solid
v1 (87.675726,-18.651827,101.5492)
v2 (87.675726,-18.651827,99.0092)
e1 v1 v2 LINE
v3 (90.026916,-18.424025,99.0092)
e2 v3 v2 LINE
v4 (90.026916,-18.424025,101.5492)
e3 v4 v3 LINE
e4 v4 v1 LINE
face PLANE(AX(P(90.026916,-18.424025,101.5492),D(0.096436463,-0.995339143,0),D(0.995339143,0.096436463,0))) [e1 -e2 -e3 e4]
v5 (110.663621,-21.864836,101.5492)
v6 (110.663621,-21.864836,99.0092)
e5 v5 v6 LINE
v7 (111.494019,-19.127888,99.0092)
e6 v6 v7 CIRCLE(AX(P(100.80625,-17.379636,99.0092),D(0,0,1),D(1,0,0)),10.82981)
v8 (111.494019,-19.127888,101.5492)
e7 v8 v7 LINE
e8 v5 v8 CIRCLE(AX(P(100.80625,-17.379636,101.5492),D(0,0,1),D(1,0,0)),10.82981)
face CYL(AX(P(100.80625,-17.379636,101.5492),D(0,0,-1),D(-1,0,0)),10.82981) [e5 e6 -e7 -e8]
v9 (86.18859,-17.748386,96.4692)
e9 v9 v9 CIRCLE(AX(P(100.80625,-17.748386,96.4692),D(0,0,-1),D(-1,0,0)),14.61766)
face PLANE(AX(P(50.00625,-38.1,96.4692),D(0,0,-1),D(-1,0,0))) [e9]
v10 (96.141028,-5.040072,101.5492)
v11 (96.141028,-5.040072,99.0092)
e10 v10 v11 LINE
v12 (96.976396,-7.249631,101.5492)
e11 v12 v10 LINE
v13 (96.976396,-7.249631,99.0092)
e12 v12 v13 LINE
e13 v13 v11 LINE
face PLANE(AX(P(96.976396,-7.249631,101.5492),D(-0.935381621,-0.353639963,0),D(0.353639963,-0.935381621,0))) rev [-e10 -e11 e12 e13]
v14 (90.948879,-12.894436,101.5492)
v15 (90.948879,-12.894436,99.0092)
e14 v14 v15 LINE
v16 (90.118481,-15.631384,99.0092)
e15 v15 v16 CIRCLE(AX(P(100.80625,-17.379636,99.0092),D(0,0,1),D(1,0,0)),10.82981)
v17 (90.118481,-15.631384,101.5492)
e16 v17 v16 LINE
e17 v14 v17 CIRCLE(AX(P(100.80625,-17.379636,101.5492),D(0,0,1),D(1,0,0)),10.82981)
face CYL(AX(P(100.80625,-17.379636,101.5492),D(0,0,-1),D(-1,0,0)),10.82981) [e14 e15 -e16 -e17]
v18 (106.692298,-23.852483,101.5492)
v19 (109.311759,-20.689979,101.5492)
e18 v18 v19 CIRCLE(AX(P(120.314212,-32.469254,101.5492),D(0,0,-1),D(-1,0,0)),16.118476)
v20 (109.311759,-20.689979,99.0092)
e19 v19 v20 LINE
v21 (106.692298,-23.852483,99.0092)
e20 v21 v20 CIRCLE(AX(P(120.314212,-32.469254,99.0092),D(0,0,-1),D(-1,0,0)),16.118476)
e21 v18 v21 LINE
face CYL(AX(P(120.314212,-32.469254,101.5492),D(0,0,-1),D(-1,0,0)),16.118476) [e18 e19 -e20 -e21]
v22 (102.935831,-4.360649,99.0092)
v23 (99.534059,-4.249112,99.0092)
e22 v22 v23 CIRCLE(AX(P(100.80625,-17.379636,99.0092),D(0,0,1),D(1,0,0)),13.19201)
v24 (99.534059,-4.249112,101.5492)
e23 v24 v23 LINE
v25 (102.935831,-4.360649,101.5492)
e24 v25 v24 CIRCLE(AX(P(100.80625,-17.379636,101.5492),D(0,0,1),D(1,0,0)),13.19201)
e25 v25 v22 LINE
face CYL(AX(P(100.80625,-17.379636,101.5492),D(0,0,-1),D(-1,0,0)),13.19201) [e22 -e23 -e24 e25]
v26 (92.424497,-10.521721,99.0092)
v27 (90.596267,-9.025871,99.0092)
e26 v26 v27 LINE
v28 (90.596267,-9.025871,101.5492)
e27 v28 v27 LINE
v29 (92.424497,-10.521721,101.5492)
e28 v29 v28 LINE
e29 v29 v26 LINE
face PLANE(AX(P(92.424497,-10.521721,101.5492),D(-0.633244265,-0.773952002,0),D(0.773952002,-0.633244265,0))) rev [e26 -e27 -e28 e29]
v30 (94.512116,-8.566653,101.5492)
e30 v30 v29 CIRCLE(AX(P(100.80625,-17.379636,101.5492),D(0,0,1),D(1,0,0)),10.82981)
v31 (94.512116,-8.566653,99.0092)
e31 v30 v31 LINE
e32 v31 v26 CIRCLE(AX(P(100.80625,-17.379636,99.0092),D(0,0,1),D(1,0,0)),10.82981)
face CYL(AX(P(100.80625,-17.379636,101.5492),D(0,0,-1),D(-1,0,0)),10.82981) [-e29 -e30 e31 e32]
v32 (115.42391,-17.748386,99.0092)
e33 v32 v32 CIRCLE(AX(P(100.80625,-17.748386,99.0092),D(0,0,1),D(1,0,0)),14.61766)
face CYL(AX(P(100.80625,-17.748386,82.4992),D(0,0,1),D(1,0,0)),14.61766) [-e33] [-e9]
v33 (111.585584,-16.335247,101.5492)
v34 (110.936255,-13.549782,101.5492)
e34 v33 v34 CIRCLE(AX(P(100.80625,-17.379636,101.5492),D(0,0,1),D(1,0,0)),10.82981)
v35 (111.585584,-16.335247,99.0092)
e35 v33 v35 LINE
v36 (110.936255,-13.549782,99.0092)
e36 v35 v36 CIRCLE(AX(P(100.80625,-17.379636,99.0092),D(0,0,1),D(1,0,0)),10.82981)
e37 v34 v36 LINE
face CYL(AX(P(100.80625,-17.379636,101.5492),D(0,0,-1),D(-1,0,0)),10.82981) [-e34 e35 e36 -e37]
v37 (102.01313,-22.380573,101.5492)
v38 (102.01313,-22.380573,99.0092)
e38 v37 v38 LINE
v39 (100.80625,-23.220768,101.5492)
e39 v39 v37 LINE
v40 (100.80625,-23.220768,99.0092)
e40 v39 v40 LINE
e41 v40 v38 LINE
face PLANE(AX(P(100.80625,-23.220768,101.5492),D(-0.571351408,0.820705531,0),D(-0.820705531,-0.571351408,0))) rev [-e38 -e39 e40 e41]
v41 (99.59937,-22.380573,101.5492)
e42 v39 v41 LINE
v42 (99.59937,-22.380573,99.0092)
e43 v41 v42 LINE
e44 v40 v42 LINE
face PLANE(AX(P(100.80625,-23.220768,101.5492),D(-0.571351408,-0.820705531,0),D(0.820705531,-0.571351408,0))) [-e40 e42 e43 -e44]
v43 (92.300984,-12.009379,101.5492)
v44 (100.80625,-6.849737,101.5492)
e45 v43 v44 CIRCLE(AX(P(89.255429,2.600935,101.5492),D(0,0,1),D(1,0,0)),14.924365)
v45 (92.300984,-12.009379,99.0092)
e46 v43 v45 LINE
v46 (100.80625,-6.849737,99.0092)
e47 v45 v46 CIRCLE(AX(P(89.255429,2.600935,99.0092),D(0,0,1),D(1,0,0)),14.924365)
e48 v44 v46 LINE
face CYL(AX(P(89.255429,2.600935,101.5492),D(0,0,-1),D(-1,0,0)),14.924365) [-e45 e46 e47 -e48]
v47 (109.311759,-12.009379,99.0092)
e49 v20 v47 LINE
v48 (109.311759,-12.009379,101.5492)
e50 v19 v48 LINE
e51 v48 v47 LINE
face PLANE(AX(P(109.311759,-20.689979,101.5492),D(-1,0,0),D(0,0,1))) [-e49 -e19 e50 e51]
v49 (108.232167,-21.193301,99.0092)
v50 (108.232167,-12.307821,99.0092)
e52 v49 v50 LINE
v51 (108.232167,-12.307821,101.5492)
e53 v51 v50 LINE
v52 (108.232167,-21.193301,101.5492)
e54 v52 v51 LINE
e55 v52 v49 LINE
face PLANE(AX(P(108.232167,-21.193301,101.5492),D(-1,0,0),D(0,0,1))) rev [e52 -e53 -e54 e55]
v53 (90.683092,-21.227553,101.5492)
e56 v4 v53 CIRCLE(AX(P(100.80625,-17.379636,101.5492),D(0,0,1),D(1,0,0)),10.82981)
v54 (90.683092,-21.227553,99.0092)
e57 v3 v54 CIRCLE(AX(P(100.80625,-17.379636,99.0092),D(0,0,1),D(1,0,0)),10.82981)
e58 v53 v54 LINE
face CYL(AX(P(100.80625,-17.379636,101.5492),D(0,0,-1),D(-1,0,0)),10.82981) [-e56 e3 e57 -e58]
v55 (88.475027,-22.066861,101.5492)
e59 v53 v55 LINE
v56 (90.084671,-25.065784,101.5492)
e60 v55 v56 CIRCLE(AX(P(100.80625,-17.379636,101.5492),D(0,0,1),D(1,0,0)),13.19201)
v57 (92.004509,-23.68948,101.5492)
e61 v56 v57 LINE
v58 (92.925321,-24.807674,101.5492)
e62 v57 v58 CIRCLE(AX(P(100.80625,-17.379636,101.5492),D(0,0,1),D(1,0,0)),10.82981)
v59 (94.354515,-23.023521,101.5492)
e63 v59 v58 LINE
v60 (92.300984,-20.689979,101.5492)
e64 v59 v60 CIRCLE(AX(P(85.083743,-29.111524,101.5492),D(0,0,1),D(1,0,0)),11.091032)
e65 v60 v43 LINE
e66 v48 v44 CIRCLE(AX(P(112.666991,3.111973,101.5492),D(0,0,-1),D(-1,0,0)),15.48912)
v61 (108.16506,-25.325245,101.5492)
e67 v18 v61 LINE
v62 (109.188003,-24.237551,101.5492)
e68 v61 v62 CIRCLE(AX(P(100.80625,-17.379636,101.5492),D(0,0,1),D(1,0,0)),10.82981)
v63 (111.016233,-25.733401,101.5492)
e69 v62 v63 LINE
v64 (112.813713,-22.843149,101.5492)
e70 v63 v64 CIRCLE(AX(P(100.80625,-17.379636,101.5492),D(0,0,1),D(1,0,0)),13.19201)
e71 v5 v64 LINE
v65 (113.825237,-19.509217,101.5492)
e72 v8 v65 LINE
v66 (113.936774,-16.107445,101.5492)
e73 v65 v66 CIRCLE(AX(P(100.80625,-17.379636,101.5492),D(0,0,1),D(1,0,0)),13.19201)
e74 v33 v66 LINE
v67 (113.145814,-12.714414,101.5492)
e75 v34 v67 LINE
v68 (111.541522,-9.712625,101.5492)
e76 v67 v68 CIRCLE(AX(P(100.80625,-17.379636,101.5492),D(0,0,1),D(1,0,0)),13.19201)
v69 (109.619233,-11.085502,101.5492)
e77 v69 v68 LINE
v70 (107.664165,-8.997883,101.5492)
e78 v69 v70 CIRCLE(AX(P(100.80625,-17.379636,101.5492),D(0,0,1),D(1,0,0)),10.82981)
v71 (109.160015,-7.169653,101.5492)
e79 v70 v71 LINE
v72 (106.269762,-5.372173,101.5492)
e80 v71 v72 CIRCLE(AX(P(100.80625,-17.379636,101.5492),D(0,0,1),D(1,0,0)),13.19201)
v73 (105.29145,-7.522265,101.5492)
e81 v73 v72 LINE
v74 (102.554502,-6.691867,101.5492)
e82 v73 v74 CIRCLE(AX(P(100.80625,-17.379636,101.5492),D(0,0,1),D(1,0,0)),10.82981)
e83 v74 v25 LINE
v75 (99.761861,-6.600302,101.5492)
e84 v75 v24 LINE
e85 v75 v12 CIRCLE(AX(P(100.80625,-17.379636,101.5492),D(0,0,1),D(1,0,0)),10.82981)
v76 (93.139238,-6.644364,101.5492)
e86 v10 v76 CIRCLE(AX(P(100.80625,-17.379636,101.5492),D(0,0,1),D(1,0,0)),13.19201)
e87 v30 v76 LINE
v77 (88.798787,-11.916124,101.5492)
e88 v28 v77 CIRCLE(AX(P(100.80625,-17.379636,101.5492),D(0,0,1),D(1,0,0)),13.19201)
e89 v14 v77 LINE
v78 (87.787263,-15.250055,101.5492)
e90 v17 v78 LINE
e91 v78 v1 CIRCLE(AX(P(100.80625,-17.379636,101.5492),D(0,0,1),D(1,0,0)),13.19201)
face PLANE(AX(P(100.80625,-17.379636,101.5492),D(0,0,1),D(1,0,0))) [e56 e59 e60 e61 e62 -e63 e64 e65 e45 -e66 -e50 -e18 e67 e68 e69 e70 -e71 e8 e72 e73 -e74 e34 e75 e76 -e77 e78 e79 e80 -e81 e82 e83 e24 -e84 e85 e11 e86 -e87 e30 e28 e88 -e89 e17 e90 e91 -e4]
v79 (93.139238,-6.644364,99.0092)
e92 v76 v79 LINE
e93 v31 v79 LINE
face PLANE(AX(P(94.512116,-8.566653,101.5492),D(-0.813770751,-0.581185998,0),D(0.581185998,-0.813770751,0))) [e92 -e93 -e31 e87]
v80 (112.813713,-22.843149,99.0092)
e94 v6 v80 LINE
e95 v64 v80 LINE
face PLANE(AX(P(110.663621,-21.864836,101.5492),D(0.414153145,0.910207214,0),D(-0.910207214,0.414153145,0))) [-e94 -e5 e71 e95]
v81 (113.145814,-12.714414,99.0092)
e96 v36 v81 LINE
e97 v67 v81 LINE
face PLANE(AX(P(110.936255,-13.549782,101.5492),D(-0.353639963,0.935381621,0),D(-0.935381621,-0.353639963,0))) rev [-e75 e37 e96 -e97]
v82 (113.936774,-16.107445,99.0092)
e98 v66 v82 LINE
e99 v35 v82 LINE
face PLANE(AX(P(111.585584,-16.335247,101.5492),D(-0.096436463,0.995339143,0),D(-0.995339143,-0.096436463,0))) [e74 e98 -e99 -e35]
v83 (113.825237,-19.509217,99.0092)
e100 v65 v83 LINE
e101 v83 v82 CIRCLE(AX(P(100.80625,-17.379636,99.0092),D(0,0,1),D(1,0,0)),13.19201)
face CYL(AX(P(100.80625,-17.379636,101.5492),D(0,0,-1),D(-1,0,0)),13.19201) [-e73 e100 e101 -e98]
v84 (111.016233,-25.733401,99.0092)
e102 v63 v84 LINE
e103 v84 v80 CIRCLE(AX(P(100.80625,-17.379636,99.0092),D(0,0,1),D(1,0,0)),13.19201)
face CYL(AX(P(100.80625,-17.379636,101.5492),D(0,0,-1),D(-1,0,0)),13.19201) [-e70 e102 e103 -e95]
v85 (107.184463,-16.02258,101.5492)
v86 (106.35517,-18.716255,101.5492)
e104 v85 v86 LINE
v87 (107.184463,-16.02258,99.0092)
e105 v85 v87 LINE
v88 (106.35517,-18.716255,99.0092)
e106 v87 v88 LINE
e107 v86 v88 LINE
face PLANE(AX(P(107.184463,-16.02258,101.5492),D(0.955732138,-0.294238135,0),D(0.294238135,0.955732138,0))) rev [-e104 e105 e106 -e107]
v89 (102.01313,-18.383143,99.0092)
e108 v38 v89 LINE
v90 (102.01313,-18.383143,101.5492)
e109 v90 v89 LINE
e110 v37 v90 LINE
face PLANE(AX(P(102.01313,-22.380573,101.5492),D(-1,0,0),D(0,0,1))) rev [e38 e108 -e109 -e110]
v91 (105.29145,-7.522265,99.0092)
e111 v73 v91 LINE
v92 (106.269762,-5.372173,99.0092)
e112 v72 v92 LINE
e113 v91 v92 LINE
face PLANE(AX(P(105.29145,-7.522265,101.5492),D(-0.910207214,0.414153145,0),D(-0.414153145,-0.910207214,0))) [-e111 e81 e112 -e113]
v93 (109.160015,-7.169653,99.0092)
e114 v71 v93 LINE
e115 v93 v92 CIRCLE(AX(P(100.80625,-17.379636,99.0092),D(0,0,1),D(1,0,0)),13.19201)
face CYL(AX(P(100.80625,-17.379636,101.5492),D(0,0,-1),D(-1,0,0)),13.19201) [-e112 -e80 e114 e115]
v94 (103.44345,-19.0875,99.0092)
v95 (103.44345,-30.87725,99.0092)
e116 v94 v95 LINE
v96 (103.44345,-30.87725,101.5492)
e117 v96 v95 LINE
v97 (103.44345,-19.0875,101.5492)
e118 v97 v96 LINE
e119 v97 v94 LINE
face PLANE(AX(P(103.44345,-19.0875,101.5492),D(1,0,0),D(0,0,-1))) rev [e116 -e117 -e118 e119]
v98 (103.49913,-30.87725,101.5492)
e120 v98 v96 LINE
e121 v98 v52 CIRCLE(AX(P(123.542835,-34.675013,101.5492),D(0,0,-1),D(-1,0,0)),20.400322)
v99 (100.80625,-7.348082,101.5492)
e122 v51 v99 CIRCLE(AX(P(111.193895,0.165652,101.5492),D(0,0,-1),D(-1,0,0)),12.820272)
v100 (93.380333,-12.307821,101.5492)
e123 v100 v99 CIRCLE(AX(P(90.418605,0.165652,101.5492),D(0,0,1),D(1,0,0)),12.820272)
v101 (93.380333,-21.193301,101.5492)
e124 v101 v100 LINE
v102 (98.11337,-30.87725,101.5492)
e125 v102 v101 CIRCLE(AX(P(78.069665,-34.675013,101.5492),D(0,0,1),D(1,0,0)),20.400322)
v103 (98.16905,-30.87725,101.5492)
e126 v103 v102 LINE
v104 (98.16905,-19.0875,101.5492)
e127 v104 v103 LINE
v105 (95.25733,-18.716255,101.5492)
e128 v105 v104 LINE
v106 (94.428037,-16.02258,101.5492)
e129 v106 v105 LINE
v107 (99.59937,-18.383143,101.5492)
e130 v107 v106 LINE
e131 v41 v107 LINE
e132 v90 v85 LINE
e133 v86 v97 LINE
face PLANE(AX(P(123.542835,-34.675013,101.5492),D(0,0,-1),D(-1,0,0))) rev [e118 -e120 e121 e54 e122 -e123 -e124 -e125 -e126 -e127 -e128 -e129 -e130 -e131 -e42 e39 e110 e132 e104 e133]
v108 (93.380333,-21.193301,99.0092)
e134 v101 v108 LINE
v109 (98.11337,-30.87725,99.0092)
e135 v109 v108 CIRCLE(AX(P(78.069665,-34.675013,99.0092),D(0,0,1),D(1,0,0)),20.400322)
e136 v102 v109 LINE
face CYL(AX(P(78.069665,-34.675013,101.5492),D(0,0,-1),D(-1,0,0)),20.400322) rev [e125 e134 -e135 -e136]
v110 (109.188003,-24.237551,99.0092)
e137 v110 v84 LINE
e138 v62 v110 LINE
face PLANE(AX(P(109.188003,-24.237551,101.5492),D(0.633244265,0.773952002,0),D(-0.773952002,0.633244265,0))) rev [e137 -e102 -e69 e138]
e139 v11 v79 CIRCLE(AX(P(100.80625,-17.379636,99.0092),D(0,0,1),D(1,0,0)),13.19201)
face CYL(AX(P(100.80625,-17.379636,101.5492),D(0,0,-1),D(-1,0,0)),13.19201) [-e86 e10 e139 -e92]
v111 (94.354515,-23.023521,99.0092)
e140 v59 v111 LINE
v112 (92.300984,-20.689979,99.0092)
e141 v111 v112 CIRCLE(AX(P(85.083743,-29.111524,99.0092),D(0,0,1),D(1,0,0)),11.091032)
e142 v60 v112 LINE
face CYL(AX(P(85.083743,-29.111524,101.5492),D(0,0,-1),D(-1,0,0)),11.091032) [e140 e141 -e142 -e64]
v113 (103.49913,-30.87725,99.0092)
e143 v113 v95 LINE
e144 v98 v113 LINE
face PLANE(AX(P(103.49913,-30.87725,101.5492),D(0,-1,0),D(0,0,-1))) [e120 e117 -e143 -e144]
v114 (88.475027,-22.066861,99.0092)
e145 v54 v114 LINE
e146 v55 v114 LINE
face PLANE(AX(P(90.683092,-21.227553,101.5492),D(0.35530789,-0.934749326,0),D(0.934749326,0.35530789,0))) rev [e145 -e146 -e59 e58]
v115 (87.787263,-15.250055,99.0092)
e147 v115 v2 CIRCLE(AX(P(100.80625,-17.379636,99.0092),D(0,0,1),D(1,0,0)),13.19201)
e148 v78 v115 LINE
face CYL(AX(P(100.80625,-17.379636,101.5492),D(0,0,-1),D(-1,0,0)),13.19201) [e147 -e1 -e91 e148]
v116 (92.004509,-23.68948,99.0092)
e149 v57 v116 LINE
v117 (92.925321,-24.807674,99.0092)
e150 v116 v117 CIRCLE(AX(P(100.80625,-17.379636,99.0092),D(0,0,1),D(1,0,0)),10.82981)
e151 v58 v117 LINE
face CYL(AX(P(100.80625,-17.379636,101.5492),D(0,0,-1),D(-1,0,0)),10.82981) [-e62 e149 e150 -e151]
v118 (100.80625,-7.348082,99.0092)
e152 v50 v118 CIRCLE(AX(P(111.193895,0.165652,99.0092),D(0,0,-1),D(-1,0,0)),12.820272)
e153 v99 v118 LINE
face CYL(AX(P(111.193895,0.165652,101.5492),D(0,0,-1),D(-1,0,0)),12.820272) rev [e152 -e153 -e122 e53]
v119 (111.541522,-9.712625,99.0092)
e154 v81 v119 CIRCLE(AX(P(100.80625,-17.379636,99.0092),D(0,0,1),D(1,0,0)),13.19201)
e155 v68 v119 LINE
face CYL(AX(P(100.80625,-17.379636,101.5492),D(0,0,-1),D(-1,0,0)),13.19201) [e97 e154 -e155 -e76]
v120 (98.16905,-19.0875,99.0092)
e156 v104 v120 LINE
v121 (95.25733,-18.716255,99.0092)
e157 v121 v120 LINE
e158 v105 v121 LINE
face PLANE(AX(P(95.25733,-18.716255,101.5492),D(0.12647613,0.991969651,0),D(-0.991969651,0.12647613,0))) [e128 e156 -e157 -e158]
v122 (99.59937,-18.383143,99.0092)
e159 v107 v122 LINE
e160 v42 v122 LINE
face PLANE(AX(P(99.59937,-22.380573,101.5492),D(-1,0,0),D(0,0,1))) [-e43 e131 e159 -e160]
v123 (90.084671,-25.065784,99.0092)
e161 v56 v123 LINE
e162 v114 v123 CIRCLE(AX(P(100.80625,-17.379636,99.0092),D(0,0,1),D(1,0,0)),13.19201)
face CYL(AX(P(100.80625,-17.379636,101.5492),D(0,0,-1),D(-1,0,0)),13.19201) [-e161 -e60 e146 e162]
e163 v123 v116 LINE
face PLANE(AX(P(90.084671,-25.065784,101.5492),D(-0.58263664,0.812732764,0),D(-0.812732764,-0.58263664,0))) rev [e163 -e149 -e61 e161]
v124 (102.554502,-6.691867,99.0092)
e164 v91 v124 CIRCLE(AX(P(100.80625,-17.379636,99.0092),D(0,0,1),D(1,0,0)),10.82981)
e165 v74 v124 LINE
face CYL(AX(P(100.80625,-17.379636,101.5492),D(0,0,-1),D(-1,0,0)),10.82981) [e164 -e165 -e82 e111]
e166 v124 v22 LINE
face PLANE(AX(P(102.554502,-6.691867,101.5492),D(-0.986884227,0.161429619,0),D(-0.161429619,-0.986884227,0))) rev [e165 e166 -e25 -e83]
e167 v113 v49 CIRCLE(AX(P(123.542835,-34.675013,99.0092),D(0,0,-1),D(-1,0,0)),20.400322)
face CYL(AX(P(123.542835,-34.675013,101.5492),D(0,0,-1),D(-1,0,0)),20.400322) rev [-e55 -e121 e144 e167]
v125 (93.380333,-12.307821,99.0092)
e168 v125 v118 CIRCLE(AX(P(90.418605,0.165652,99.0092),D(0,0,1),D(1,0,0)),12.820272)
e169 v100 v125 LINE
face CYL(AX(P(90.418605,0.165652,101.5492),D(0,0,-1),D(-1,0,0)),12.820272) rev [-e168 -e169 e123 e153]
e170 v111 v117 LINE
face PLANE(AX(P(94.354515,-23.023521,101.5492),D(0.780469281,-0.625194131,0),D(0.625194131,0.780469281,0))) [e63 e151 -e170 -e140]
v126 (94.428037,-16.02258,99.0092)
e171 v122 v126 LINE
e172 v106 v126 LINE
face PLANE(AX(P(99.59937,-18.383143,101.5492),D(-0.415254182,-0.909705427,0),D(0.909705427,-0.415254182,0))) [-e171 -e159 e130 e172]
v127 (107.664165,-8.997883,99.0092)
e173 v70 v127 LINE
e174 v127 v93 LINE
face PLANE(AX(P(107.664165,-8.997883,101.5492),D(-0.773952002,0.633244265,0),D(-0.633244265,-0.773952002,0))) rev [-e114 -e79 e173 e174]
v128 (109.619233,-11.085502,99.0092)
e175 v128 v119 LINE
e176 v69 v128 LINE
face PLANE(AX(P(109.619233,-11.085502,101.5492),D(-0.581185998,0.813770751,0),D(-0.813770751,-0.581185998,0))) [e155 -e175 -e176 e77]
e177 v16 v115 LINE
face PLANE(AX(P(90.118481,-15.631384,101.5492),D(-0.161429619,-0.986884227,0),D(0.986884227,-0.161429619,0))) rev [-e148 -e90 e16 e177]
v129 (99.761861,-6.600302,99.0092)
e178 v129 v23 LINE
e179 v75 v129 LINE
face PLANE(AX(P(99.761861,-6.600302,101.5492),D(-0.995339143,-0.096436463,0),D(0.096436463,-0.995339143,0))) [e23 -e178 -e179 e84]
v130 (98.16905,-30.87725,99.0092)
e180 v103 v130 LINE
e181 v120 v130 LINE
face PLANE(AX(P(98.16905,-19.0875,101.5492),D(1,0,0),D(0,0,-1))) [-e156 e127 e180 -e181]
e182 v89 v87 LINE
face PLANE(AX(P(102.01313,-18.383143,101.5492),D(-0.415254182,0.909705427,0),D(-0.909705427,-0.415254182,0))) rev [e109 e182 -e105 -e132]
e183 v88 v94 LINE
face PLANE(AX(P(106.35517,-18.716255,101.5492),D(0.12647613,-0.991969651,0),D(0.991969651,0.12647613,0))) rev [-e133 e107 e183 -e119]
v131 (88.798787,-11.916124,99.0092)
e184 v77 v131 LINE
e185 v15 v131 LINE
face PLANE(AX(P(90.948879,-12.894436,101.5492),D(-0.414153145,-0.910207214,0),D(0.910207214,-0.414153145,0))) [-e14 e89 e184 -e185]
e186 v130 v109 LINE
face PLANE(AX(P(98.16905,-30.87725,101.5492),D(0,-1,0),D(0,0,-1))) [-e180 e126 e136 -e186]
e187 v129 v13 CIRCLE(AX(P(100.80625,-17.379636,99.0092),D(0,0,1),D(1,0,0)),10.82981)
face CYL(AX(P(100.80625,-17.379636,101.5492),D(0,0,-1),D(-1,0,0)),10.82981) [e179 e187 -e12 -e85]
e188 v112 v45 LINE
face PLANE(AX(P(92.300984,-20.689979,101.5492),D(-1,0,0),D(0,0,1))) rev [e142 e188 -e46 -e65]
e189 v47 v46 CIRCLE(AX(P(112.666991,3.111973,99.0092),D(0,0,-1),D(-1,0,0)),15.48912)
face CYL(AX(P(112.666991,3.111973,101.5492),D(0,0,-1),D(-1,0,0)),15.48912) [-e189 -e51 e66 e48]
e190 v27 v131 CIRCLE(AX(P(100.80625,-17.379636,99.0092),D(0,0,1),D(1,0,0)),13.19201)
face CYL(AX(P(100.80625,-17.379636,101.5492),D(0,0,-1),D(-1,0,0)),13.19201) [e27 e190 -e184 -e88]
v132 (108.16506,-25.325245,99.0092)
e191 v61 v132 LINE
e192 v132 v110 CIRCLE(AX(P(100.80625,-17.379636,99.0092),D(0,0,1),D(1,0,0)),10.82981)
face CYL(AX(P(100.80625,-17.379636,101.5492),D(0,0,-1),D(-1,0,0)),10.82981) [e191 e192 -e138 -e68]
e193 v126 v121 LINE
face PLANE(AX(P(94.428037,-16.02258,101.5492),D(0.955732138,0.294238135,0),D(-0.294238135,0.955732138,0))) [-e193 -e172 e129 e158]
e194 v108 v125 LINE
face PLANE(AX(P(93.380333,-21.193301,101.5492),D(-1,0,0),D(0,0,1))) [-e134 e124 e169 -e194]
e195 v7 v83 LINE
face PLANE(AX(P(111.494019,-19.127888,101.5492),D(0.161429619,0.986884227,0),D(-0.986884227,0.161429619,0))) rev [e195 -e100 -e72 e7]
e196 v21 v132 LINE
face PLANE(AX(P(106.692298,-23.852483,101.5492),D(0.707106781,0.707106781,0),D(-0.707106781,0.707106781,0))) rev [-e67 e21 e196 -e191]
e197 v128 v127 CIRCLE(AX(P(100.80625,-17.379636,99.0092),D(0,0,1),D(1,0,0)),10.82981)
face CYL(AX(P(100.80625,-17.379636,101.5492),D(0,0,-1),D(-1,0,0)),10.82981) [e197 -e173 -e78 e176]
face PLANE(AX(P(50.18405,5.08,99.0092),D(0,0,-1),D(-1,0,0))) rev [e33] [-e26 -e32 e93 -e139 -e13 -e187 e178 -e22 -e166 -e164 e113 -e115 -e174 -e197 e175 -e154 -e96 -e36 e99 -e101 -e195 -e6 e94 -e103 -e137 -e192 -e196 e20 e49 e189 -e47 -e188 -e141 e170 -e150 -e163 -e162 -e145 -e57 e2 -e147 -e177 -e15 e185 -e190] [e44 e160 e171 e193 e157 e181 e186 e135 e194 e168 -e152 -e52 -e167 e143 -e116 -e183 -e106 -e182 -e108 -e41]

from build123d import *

# Parameters (mm, degrees)
SKETCH1_R               = 13.8795
SKETCH1_R_2             = 13.8811
SKETCH1_R_3             = 2.54
SKETCH1_W               = 163.5125
SKETCH1_H               = 30.6038
BOSS_EXTRUDE1_DEPTH     = 5.08
SKETCH3_W               = 101.6
SKETCH3_H               = 2.54
BOSS_EXTRUDE4_DEPTH     = 38.1
SKETCH7_W               = 7.620008307
SKETCH7_H               = 5.08
BOSS_EXTRUDE5_DEPTH     = 11.43
FILLET5_RADIUS          = 3.810004153
FILLET5_LENGTH          = 5.08
BOSS_EXTRUDE6_DEPTH     = 2.54
SKETCH15_R              = 1.8415
BOSS_EXTRUDE7_DEPTH     = 2.54
CUT_EXTRUDE3_START      = -5.08
SKETCH19_R              = 1.8415
CUT_EXTRUDE3_DEPTH      = 5.08
SKETCH12_W              = 155.030782426
SKETCH12_H              = 26.837151361
CUT_EXTRUDE4_DEPTH      = 229.935471644
CUT_EXTRUDE5_DEPTH      = 2.54
FILLET6_R               = 2.54
BOSS_EXTRUDE8_DEPTH     = 5.08
CUT_EXTRUDE6_DEPTH      = 186.437362631
CUT_EXTRUDE6_DEPTH_BACK = 186.437362631
SKETCH23_R              = 1.8415
SKETCH25_W              = 130.43271363
SKETCH25_H              = 56.644769142
SKETCH25_R              = 14.617659747
CUT_EXTRUDE8_DEPTH      = 158.1898379


with BuildPart() as part:
    # Sketch1 → Boss-Extrude1 (new body)
    with BuildSketch(Plane(origin=(0, 0, 0), x_dir=(1, 0, 0), z_dir=(0, 1, 0))):
        with BuildLine():
            Line((0, 0), (201.6125, 0))
            Line((201.6125, 0), (201.6125, -45.847))
            Line((201.6125, -45.847), (166.66845, -45.847))
            Line((166.66845, -45.847), (166.66845, -83.7692))
            ThreePointArc((166.66845, -83.7692), (162.204757345, -94.545507345), (151.42845, -99.0092))
            Line((151.42845, -99.0092), (50.18405, -99.0092))
            ThreePointArc((50.18405, -99.0092), (39.407742655, -94.545507345), (34.94405, -83.7692))
            Line((34.94405, -83.7692), (34.94405, -45.847))
            Line((34.94405, -45.847), (0, -45.847))
            Line((0, -45.847), (0, 0))
        make_face()
        with Locations(Location((60.34405, -72.4265, 0), (0, 0, 270))):
            Circle(SKETCH1_R, mode=Mode.SUBTRACT)
        with Locations(Location((141.26845, -72.4281, 0), (0, 0, 270))):
            Circle(SKETCH1_R_2, mode=Mode.SUBTRACT)
        with Locations(Location((13.096875, -9.7139, 0), (0, 0, 270))):
            Circle(SKETCH1_R_3, mode=Mode.SUBTRACT)
        with Locations(Location((188.515625, -9.7139, 0), (0, 0, 270))):
            Circle(SKETCH1_R_3, mode=Mode.SUBTRACT)
        with Locations(Location((13.096875, -36.1299, 0), (0, 0, 270))):
            Circle(SKETCH1_R_3, mode=Mode.SUBTRACT)
        with Locations(Location((188.515625, -36.1299, 0), (0, 0, 270))):
            Circle(SKETCH1_R_3, mode=Mode.SUBTRACT)
        with Locations(Location((100.80625, -72.4281, 0), (0, 0, 270))):
            Circle(SKETCH1_R_2, mode=Mode.SUBTRACT)
        with Locations((100.80625, -22.9219)):
            Rectangle(SKETCH1_W, SKETCH1_H, mode=Mode.SUBTRACT)
    extrude(amount=BOSS_EXTRUDE1_DEPTH)

    # Sketch3 → Boss-Extrude4 (add)
    with BuildSketch(Plane(origin=(0, 0, 198.0184), x_dir=(-1, 0, 0), z_dir=(0, 1, 0))):
        with Locations((-100.80625, -100.2792)):
            Rectangle(SKETCH3_W, SKETCH3_H)
    extrude(amount=-BOSS_EXTRUDE4_DEPTH)

    # Sketch7 → Boss-Extrude5 (add)
    with BuildSketch(Plane(origin=(0, 0, 99.0092), x_dir=(1, 0, 0), z_dir=(0, 0, -1))):
        with Locations((100.806245847, 35.56)):
            Rectangle(SKETCH7_W, SKETCH7_H)
    extrude(amount=BOSS_EXTRUDE5_DEPTH)

    # Fillet5: full round fillet: the end face becomes a half cylinder, R = half its width
    fillet5_face = Plane((100.806245847, -35.56, 87.5792), x_dir=(0, 1, 0), z_dir=(0, 0, -1))  # on the end face: x along it, z out of the body
    fillet5_slab = fillet5_face.offset(-FILLET5_RADIUS / 2) * Box(FILLET5_LENGTH, 2 * FILLET5_RADIUS, FILLET5_RADIUS, mode=Mode.PRIVATE)  # the body's end, R deep
    fillet5_round = Plane((100.806245847, -35.56, 91.389204153), x_dir=(0, 0, -1), z_dir=(0, 1, 0)) * Cylinder(FILLET5_RADIUS, FILLET5_LENGTH, mode=Mode.PRIVATE)  # its axis R under the face
    add(fillet5_slab - fillet5_round, mode=Mode.SUBTRACT)

    # Sketch14 → Boss-Extrude6 (add)
    with BuildSketch(Plane(origin=(0, 0, 99.0092), x_dir=(-1, 0, 0), z_dir=(0, 0, -1))):
        with BuildLine():
            Line((-106.692297799, -23.852483199), (-108.165059803, -25.325245202))
            ThreePointArc((-108.165059803, -25.325245202), (-108.695299399, -24.799048835), (-109.188003193, -24.237551179))
            Line((-109.188003193, -24.237551179), (-111.016232612, -25.73340078))
            ThreePointArc((-111.016232612, -25.73340078), (-112.008576056, -24.346487635), (-112.813712744, -22.843148519))
            Line((-112.813712744, -22.843148519), (-110.663621263, -21.864835961))
            ThreePointArc((-110.663621263, -21.864835961), (-111.169570673, -20.523896068), (-111.494018753, -19.127888173))
            Line((-111.494018753, -19.127888173), (-113.825236675, -19.509217219))
            ThreePointArc((-113.825236675, -19.509217219), (-113.991174734, -17.81194348), (-113.936774001, -16.107445271))
            Line((-113.936774001, -16.107445271), (-111.585583879, -16.335247483))
            ThreePointArc((-111.585583879, -16.335247483), (-111.353278975, -14.920984767), (-110.936255307, -13.549782426))
            Line((-110.936255307, -13.549782426), (-113.145813772, -12.714414106))
            ThreePointArc((-113.145813772, -12.714414106), (-112.440883477, -11.161562901), (-111.541521956, -9.712624518))
            Line((-111.541521956, -9.712624518), (-109.619232687, -11.085502082))
            ThreePointArc((-109.619232687, -11.085502082), (-108.71091938, -9.976867094), (-107.664165119, -8.997882867))
            Line((-107.664165119, -8.997882867), (-109.160014721, -7.169653447))
            ThreePointArc((-109.160014721, -7.169653447), (-107.773101576, -6.177310003), (-106.26976246, -5.372173315))
            Line((-106.26976246, -5.372173315), (-105.291449901, -7.522264796))
            ThreePointArc((-105.291449901, -7.522264796), (-103.950510009, -7.016315387), (-102.554502114, -6.691867307))
            Line((-102.554502114, -6.691867307), (-102.93583116, -4.360649385))
            ThreePointArc((-102.93583116, -4.360649385), (-101.238557421, -4.194711325), (-99.534059212, -4.249112058))
            Line((-99.534059212, -4.249112058), (-99.761861424, -6.600302181))
            ThreePointArc((-99.761861424, -6.600302181), (-98.347598708, -6.832607085), (-96.976396367, -7.249630753))
            Line((-96.976396367, -7.249630753), (-96.141028047, -5.040072288))
            ThreePointArc((-96.141028047, -5.040072288), (-94.588176842, -5.745002582), (-93.139238459, -6.644364103))
            Line((-93.139238459, -6.644364103), (-94.512116023, -8.566653372))
            ThreePointArc((-94.512116023, -8.566653372), (-93.403481035, -9.474966679), (-92.424496807, -10.52172094))
            Line((-92.424496807, -10.52172094), (-90.596267388, -9.025871338))
            ThreePointArc((-90.596267388, -9.025871338), (-89.603923944, -10.412784483), (-88.798787256, -11.9161236))
            Line((-88.798787256, -11.9161236), (-90.948878737, -12.894436158))
            ThreePointArc((-90.948878737, -12.894436158), (-90.442929327, -14.23537605), (-90.118481247, -15.631383945))
            Line((-90.118481247, -15.631383945), (-87.787263325, -15.250054899))
            ThreePointArc((-87.787263325, -15.250054899), (-87.621325266, -16.947328638), (-87.675725999, -18.651826847))
            Line((-87.675725999, -18.651826847), (-90.026916121, -18.424024635))
            ThreePointArc((-90.026916121, -18.424024635), (-90.261418035, -19.847693028), (-90.683092324, -21.227553033))
            Line((-90.683092324, -21.227553033), (-88.475027465, -22.066861331))
            ThreePointArc((-88.475027465, -22.066861331), (-89.182726542, -23.618452644), (-90.084671181, -25.065784483))
            Line((-90.084671181, -25.065784483), (-92.004508517, -23.689480212))
            ThreePointArc((-92.004508517, -23.689480212), (-92.446198552, -24.26398978), (-92.925321338, -24.807674144))
            Line((-92.925321338, -24.807674144), (-94.354515121, -23.023521367))
            ThreePointArc((-94.354515121, -23.023521367), (-93.409906556, -21.784451479), (-92.300984022, -20.689978846))
            Line((-92.300984022, -20.689978846), (-92.300984022, -12.009378674))
            ThreePointArc((-92.300984022, -12.009378674), (-96.99616691, -10.159066764), (-100.80625, -6.84973702))
            ThreePointArc((-100.80625, -6.84973702), (-104.633502919, -10.130984342), (-109.311759392, -12.009378674))
            Line((-109.311759392, -12.009378674), (-109.311759392, -20.689978846))
            ThreePointArc((-109.311759392, -20.689978846), (-107.900903874, -22.187470719), (-106.692297799, -23.852483199))
        make_face()
        with BuildLine():
            Line((-100.80625, -23.220768427), (-99.599369927, -22.380573493))
            Line((-99.599369927, -22.380573493), (-99.599369927, -18.3831432))
            Line((-99.599369927, -18.3831432), (-94.428037288, -16.022579614))
            Line((-94.428037288, -16.022579614), (-95.257330485, -18.716255471))
            Line((-95.257330485, -18.716255471), (-98.169049816, -19.087499686))
            Line((-98.169049816, -19.087499686), (-98.169049816, -30.877249674))
            Line((-98.169049816, -30.877249674), (-98.113370072, -30.877249674))
            ThreePointArc((-98.113370072, -30.877249674), (-96.397994117, -25.717029016), (-93.380333496, -21.193300875))
            Line((-93.380333496, -21.193300875), (-93.380333496, -12.307821257))
            ThreePointArc((-93.380333496, -12.307821257), (-97.539082277, -10.495406691), (-100.80625, -7.348081946))
            ThreePointArc((-100.80625, -7.348081946), (-104.073417723, -10.495406691), (-108.232166504, -12.307821257))
            Line((-108.232166504, -12.307821257), (-108.232166504, -21.193300875))
            ThreePointArc((-108.232166504, -21.193300875), (-105.214505883, -25.717029016), (-103.499129928, -30.877249674))
            Line((-103.499129928, -30.877249674), (-103.443450184, -30.877249674))
            Line((-103.443450184, -30.877249674), (-103.443450184, -19.087499686))
            Line((-103.443450184, -19.087499686), (-106.355169515, -18.716255471))
            Line((-106.355169515, -18.716255471), (-107.184462712, -16.022579614))
            Line((-107.184462712, -16.022579614), (-102.013130073, -18.3831432))
            Line((-102.013130073, -18.3831432), (-102.013130073, -22.380573493))
            Line((-102.013130073, -22.380573493), (-100.80625, -23.220768427))
        make_face()
    extrude(amount=-BOSS_EXTRUDE6_DEPTH)

    # Sketch15 → Boss-Extrude7 (add)
    # profile 1 of 2: a face of its own
    with BuildSketch(Plane.XZ):
        with BuildLine():
            Line((114.68735, 88.8492), (114.68735, 96.4692))
            Line((114.68735, 96.4692), (127.38735, 96.4692))
            Line((127.38735, 96.4692), (127.38735, 88.8492))
            ThreePointArc((127.38735, 88.8492), (121.03735, 82.4992), (114.68735, 88.8492))
        make_face()
        with Locations(Location((121.03735, 88.8492, 0), (0, 0, 270))):
            Circle(SKETCH15_R, mode=Mode.SUBTRACT)
    # profile 2 of 2: a face of its own
    with BuildSketch(Plane.XZ):
        with BuildLine():
            Line((74.22515, 96.4692), (86.92515, 96.4692))
            Line((86.92515, 96.4692), (86.92515, 88.8492))
            ThreePointArc((86.92515, 88.8492), (80.57515, 82.4992), (74.22515, 88.8492))
            Line((74.22515, 88.8492), (74.22515, 96.4692))
        make_face()
        with Locations(Location((80.57515, 88.8492, 0), (0, 0, 90))):
            Circle(SKETCH15_R, mode=Mode.SUBTRACT)
    extrude(amount=BOSS_EXTRUDE7_DEPTH)

    # Sketch19 → Cut-Extrude3 (cut)
    with BuildSketch(Plane.XZ.offset(CUT_EXTRUDE3_START)):
        with Locations(Location((80.57515, 88.8492, 0), (0, 0, 90))):
            Circle(SKETCH19_R)
        with Locations(Location((121.03735, 88.8492, 0), (0, 0, 270))):
            Circle(SKETCH19_R)
    extrude(amount=CUT_EXTRUDE3_DEPTH, mode=Mode.SUBTRACT)

    # Sketch12 → Cut-Extrude4 (cut, through all)
    with BuildSketch(Plane(origin=(201.6125, 0, 0), x_dir=(0, 0, -1), z_dir=(1, 0, 0))):
        with Locations((-77.515391213, 13.418575681)):
            Rectangle(SKETCH12_W, SKETCH12_H)
    extrude(amount=-CUT_EXTRUDE4_DEPTH, mode=Mode.SUBTRACT)

    # Sketch21 → Cut-Extrude5 (cut)
    with BuildSketch(Plane.XY.offset(99.0092)):
        Polygon((55.08625, -33.02), (55.08625, -25.835795103), (62.270454897, -33.02), align=None)
        Polygon((55.08625, -5.08), (55.883069587, -5.08), (83.823069587, -33.02), (76.638864691, -33.02), (55.08625, -11.467385309), align=None)
        with BuildLine():
            Line((91.916241693, -33.02), (91.916241693, -30.737077601))
            ThreePointArc((91.916241693, -30.737077601), (89.237970167, -28.421401444), (87.1450505, -25.565673567))
            Line((87.1450505, -25.565673567), (66.659376933, -5.08))
            Line((66.659376933, -5.08), (59.475172036, -5.08))
            Line((59.475172036, -5.08), (87.415172036, -33.02))
            Line((87.415172036, -33.02), (91.916241693, -33.02))
        make_face()
        Polygon((146.52625, -5.08), (145.729430413, -5.08), (117.789430413, -33.02), (124.973635309, -33.02), (146.52625, -11.467385309), align=None)
        with BuildLine():
            Line((109.69625, -33.02), (114.197327964, -33.02))
            Line((114.197327964, -33.02), (142.137327964, -5.08))
            Line((142.137327964, -5.08), (134.953123067, -5.08))
            Line((134.953123067, -5.08), (114.4674495, -25.565673567))
            ThreePointArc((114.4674495, -25.565673567), (112.374526421, -28.421405143), (109.69625, -30.737083287))
            Line((109.69625, -30.737083287), (109.69625, -33.02))
        make_face()
        Polygon((146.52625, -33.02), (146.52625, -25.835795103), (139.342045103, -33.02), align=None)
        Polygon((135.749942655, -33.02), (146.52625, -22.243692655), (146.52625, -15.059487758), (128.565737758, -33.02), align=None)
        with BuildLine():
            Line((124.176815722, -5.08), (115.916182775, -13.340632947))
            ThreePointArc((115.916182775, -13.340632947), (116.509577502, -16.678871551), (116.374281129, -20.06673949))
            Line((116.374281129, -20.06673949), (131.361020619, -5.08))
            Line((131.361020619, -5.08), (124.176815722, -5.08))
        make_face()
        with BuildLine():
            Line((120.584713274, -5.08), (114.907893678, -10.756819596))
            ThreePointArc((114.907893678, -10.756819596), (113.575134343, -8.545454533), (111.89877754, -6.581730837))
            Line((111.89877754, -6.581730837), (113.400508377, -5.08))
            Line((113.400508377, -5.08), (120.584713274, -5.08))
        make_face()
        Polygon((65.862557345, -33.02), (55.08625, -22.243692655), (55.08625, -15.059487758), (73.046762242, -33.02), align=None)
        with BuildLine():
            Line((70.251479381, -5.08), (85.238218871, -20.06673949))
            ThreePointArc((85.238218871, -20.06673949), (85.102922498, -16.678871551), (85.696317225, -13.340632947))
            Line((85.696317225, -13.340632947), (77.435684278, -5.08))
            Line((77.435684278, -5.08), (70.251479381, -5.08))
        make_face()
        with BuildLine():
            Line((81.027786726, -5.08), (86.704606322, -10.756819596))
            ThreePointArc((86.704606322, -10.756819596), (88.037365657, -8.545454533), (89.71372246, -6.581730837))
            Line((89.71372246, -6.581730837), (88.211991623, -5.08))
            Line((88.211991623, -5.08), (81.027786726, -5.08))
        make_face()
    extrude(amount=-CUT_EXTRUDE5_DEPTH, mode=Mode.SUBTRACT)

    # Fillet6
    fillet6_edges = [part.edges().sort_by_distance(p)[0] for p in [
        (151.60625, -19.05, 99.0092),
        (50.00625, -19.05, 99.0092),
    ]]
    fillet(fillet6_edges, radius=FILLET6_R - 0.0001)  # a hair under: the kernel refuses the full size

    # Sketch22 → Boss-Extrude8 (add)
    with BuildSketch(Plane(origin=(0, -33.02, 0), x_dir=(1, 0, 0), z_dir=(0, 1, 0))):
        with BuildLine():
            Line((94.45625, -96.4692), (94.45625, -88.8492))
            ThreePointArc((94.45625, -88.8492), (100.80625, -82.4992), (107.15625, -88.8492))
            Line((107.15625, -88.8492), (107.15625, -96.4692))
            Line((107.15625, -96.4692), (94.45625, -96.4692))
        make_face()
    extrude(amount=-BOSS_EXTRUDE8_DEPTH)

    # Sketch23 → Cut-Extrude6 (cut, two sides: drawn at the far end of the back side and taken through both)
    with BuildSketch(Plane(origin=(0, -33.02, 0), x_dir=(1, 0, 0), z_dir=(0, 1, 0)).offset(-CUT_EXTRUDE6_DEPTH_BACK)):
        with Locations(Location((100.80625, -88.8492, 0), (0, 0, 270))):
            Circle(SKETCH23_R)
    extrude(amount=CUT_EXTRUDE6_DEPTH + CUT_EXTRUDE6_DEPTH_BACK, mode=Mode.SUBTRACT)

    # Sketch25 → Cut-Extrude8 (cut, through all)
    with BuildSketch(Plane.XY.offset(99.0092)):
        with Locations((92.75102303, -12.285674788)):
            Rectangle(SKETCH25_W, SKETCH25_H)
        with Locations((100.80625, -17.748386051)):
            Circle(SKETCH25_R, mode=Mode.SUBTRACT)
    extrude(amount=-CUT_EXTRUDE8_DEPTH, mode=Mode.SUBTRACT)


solid = part.part
